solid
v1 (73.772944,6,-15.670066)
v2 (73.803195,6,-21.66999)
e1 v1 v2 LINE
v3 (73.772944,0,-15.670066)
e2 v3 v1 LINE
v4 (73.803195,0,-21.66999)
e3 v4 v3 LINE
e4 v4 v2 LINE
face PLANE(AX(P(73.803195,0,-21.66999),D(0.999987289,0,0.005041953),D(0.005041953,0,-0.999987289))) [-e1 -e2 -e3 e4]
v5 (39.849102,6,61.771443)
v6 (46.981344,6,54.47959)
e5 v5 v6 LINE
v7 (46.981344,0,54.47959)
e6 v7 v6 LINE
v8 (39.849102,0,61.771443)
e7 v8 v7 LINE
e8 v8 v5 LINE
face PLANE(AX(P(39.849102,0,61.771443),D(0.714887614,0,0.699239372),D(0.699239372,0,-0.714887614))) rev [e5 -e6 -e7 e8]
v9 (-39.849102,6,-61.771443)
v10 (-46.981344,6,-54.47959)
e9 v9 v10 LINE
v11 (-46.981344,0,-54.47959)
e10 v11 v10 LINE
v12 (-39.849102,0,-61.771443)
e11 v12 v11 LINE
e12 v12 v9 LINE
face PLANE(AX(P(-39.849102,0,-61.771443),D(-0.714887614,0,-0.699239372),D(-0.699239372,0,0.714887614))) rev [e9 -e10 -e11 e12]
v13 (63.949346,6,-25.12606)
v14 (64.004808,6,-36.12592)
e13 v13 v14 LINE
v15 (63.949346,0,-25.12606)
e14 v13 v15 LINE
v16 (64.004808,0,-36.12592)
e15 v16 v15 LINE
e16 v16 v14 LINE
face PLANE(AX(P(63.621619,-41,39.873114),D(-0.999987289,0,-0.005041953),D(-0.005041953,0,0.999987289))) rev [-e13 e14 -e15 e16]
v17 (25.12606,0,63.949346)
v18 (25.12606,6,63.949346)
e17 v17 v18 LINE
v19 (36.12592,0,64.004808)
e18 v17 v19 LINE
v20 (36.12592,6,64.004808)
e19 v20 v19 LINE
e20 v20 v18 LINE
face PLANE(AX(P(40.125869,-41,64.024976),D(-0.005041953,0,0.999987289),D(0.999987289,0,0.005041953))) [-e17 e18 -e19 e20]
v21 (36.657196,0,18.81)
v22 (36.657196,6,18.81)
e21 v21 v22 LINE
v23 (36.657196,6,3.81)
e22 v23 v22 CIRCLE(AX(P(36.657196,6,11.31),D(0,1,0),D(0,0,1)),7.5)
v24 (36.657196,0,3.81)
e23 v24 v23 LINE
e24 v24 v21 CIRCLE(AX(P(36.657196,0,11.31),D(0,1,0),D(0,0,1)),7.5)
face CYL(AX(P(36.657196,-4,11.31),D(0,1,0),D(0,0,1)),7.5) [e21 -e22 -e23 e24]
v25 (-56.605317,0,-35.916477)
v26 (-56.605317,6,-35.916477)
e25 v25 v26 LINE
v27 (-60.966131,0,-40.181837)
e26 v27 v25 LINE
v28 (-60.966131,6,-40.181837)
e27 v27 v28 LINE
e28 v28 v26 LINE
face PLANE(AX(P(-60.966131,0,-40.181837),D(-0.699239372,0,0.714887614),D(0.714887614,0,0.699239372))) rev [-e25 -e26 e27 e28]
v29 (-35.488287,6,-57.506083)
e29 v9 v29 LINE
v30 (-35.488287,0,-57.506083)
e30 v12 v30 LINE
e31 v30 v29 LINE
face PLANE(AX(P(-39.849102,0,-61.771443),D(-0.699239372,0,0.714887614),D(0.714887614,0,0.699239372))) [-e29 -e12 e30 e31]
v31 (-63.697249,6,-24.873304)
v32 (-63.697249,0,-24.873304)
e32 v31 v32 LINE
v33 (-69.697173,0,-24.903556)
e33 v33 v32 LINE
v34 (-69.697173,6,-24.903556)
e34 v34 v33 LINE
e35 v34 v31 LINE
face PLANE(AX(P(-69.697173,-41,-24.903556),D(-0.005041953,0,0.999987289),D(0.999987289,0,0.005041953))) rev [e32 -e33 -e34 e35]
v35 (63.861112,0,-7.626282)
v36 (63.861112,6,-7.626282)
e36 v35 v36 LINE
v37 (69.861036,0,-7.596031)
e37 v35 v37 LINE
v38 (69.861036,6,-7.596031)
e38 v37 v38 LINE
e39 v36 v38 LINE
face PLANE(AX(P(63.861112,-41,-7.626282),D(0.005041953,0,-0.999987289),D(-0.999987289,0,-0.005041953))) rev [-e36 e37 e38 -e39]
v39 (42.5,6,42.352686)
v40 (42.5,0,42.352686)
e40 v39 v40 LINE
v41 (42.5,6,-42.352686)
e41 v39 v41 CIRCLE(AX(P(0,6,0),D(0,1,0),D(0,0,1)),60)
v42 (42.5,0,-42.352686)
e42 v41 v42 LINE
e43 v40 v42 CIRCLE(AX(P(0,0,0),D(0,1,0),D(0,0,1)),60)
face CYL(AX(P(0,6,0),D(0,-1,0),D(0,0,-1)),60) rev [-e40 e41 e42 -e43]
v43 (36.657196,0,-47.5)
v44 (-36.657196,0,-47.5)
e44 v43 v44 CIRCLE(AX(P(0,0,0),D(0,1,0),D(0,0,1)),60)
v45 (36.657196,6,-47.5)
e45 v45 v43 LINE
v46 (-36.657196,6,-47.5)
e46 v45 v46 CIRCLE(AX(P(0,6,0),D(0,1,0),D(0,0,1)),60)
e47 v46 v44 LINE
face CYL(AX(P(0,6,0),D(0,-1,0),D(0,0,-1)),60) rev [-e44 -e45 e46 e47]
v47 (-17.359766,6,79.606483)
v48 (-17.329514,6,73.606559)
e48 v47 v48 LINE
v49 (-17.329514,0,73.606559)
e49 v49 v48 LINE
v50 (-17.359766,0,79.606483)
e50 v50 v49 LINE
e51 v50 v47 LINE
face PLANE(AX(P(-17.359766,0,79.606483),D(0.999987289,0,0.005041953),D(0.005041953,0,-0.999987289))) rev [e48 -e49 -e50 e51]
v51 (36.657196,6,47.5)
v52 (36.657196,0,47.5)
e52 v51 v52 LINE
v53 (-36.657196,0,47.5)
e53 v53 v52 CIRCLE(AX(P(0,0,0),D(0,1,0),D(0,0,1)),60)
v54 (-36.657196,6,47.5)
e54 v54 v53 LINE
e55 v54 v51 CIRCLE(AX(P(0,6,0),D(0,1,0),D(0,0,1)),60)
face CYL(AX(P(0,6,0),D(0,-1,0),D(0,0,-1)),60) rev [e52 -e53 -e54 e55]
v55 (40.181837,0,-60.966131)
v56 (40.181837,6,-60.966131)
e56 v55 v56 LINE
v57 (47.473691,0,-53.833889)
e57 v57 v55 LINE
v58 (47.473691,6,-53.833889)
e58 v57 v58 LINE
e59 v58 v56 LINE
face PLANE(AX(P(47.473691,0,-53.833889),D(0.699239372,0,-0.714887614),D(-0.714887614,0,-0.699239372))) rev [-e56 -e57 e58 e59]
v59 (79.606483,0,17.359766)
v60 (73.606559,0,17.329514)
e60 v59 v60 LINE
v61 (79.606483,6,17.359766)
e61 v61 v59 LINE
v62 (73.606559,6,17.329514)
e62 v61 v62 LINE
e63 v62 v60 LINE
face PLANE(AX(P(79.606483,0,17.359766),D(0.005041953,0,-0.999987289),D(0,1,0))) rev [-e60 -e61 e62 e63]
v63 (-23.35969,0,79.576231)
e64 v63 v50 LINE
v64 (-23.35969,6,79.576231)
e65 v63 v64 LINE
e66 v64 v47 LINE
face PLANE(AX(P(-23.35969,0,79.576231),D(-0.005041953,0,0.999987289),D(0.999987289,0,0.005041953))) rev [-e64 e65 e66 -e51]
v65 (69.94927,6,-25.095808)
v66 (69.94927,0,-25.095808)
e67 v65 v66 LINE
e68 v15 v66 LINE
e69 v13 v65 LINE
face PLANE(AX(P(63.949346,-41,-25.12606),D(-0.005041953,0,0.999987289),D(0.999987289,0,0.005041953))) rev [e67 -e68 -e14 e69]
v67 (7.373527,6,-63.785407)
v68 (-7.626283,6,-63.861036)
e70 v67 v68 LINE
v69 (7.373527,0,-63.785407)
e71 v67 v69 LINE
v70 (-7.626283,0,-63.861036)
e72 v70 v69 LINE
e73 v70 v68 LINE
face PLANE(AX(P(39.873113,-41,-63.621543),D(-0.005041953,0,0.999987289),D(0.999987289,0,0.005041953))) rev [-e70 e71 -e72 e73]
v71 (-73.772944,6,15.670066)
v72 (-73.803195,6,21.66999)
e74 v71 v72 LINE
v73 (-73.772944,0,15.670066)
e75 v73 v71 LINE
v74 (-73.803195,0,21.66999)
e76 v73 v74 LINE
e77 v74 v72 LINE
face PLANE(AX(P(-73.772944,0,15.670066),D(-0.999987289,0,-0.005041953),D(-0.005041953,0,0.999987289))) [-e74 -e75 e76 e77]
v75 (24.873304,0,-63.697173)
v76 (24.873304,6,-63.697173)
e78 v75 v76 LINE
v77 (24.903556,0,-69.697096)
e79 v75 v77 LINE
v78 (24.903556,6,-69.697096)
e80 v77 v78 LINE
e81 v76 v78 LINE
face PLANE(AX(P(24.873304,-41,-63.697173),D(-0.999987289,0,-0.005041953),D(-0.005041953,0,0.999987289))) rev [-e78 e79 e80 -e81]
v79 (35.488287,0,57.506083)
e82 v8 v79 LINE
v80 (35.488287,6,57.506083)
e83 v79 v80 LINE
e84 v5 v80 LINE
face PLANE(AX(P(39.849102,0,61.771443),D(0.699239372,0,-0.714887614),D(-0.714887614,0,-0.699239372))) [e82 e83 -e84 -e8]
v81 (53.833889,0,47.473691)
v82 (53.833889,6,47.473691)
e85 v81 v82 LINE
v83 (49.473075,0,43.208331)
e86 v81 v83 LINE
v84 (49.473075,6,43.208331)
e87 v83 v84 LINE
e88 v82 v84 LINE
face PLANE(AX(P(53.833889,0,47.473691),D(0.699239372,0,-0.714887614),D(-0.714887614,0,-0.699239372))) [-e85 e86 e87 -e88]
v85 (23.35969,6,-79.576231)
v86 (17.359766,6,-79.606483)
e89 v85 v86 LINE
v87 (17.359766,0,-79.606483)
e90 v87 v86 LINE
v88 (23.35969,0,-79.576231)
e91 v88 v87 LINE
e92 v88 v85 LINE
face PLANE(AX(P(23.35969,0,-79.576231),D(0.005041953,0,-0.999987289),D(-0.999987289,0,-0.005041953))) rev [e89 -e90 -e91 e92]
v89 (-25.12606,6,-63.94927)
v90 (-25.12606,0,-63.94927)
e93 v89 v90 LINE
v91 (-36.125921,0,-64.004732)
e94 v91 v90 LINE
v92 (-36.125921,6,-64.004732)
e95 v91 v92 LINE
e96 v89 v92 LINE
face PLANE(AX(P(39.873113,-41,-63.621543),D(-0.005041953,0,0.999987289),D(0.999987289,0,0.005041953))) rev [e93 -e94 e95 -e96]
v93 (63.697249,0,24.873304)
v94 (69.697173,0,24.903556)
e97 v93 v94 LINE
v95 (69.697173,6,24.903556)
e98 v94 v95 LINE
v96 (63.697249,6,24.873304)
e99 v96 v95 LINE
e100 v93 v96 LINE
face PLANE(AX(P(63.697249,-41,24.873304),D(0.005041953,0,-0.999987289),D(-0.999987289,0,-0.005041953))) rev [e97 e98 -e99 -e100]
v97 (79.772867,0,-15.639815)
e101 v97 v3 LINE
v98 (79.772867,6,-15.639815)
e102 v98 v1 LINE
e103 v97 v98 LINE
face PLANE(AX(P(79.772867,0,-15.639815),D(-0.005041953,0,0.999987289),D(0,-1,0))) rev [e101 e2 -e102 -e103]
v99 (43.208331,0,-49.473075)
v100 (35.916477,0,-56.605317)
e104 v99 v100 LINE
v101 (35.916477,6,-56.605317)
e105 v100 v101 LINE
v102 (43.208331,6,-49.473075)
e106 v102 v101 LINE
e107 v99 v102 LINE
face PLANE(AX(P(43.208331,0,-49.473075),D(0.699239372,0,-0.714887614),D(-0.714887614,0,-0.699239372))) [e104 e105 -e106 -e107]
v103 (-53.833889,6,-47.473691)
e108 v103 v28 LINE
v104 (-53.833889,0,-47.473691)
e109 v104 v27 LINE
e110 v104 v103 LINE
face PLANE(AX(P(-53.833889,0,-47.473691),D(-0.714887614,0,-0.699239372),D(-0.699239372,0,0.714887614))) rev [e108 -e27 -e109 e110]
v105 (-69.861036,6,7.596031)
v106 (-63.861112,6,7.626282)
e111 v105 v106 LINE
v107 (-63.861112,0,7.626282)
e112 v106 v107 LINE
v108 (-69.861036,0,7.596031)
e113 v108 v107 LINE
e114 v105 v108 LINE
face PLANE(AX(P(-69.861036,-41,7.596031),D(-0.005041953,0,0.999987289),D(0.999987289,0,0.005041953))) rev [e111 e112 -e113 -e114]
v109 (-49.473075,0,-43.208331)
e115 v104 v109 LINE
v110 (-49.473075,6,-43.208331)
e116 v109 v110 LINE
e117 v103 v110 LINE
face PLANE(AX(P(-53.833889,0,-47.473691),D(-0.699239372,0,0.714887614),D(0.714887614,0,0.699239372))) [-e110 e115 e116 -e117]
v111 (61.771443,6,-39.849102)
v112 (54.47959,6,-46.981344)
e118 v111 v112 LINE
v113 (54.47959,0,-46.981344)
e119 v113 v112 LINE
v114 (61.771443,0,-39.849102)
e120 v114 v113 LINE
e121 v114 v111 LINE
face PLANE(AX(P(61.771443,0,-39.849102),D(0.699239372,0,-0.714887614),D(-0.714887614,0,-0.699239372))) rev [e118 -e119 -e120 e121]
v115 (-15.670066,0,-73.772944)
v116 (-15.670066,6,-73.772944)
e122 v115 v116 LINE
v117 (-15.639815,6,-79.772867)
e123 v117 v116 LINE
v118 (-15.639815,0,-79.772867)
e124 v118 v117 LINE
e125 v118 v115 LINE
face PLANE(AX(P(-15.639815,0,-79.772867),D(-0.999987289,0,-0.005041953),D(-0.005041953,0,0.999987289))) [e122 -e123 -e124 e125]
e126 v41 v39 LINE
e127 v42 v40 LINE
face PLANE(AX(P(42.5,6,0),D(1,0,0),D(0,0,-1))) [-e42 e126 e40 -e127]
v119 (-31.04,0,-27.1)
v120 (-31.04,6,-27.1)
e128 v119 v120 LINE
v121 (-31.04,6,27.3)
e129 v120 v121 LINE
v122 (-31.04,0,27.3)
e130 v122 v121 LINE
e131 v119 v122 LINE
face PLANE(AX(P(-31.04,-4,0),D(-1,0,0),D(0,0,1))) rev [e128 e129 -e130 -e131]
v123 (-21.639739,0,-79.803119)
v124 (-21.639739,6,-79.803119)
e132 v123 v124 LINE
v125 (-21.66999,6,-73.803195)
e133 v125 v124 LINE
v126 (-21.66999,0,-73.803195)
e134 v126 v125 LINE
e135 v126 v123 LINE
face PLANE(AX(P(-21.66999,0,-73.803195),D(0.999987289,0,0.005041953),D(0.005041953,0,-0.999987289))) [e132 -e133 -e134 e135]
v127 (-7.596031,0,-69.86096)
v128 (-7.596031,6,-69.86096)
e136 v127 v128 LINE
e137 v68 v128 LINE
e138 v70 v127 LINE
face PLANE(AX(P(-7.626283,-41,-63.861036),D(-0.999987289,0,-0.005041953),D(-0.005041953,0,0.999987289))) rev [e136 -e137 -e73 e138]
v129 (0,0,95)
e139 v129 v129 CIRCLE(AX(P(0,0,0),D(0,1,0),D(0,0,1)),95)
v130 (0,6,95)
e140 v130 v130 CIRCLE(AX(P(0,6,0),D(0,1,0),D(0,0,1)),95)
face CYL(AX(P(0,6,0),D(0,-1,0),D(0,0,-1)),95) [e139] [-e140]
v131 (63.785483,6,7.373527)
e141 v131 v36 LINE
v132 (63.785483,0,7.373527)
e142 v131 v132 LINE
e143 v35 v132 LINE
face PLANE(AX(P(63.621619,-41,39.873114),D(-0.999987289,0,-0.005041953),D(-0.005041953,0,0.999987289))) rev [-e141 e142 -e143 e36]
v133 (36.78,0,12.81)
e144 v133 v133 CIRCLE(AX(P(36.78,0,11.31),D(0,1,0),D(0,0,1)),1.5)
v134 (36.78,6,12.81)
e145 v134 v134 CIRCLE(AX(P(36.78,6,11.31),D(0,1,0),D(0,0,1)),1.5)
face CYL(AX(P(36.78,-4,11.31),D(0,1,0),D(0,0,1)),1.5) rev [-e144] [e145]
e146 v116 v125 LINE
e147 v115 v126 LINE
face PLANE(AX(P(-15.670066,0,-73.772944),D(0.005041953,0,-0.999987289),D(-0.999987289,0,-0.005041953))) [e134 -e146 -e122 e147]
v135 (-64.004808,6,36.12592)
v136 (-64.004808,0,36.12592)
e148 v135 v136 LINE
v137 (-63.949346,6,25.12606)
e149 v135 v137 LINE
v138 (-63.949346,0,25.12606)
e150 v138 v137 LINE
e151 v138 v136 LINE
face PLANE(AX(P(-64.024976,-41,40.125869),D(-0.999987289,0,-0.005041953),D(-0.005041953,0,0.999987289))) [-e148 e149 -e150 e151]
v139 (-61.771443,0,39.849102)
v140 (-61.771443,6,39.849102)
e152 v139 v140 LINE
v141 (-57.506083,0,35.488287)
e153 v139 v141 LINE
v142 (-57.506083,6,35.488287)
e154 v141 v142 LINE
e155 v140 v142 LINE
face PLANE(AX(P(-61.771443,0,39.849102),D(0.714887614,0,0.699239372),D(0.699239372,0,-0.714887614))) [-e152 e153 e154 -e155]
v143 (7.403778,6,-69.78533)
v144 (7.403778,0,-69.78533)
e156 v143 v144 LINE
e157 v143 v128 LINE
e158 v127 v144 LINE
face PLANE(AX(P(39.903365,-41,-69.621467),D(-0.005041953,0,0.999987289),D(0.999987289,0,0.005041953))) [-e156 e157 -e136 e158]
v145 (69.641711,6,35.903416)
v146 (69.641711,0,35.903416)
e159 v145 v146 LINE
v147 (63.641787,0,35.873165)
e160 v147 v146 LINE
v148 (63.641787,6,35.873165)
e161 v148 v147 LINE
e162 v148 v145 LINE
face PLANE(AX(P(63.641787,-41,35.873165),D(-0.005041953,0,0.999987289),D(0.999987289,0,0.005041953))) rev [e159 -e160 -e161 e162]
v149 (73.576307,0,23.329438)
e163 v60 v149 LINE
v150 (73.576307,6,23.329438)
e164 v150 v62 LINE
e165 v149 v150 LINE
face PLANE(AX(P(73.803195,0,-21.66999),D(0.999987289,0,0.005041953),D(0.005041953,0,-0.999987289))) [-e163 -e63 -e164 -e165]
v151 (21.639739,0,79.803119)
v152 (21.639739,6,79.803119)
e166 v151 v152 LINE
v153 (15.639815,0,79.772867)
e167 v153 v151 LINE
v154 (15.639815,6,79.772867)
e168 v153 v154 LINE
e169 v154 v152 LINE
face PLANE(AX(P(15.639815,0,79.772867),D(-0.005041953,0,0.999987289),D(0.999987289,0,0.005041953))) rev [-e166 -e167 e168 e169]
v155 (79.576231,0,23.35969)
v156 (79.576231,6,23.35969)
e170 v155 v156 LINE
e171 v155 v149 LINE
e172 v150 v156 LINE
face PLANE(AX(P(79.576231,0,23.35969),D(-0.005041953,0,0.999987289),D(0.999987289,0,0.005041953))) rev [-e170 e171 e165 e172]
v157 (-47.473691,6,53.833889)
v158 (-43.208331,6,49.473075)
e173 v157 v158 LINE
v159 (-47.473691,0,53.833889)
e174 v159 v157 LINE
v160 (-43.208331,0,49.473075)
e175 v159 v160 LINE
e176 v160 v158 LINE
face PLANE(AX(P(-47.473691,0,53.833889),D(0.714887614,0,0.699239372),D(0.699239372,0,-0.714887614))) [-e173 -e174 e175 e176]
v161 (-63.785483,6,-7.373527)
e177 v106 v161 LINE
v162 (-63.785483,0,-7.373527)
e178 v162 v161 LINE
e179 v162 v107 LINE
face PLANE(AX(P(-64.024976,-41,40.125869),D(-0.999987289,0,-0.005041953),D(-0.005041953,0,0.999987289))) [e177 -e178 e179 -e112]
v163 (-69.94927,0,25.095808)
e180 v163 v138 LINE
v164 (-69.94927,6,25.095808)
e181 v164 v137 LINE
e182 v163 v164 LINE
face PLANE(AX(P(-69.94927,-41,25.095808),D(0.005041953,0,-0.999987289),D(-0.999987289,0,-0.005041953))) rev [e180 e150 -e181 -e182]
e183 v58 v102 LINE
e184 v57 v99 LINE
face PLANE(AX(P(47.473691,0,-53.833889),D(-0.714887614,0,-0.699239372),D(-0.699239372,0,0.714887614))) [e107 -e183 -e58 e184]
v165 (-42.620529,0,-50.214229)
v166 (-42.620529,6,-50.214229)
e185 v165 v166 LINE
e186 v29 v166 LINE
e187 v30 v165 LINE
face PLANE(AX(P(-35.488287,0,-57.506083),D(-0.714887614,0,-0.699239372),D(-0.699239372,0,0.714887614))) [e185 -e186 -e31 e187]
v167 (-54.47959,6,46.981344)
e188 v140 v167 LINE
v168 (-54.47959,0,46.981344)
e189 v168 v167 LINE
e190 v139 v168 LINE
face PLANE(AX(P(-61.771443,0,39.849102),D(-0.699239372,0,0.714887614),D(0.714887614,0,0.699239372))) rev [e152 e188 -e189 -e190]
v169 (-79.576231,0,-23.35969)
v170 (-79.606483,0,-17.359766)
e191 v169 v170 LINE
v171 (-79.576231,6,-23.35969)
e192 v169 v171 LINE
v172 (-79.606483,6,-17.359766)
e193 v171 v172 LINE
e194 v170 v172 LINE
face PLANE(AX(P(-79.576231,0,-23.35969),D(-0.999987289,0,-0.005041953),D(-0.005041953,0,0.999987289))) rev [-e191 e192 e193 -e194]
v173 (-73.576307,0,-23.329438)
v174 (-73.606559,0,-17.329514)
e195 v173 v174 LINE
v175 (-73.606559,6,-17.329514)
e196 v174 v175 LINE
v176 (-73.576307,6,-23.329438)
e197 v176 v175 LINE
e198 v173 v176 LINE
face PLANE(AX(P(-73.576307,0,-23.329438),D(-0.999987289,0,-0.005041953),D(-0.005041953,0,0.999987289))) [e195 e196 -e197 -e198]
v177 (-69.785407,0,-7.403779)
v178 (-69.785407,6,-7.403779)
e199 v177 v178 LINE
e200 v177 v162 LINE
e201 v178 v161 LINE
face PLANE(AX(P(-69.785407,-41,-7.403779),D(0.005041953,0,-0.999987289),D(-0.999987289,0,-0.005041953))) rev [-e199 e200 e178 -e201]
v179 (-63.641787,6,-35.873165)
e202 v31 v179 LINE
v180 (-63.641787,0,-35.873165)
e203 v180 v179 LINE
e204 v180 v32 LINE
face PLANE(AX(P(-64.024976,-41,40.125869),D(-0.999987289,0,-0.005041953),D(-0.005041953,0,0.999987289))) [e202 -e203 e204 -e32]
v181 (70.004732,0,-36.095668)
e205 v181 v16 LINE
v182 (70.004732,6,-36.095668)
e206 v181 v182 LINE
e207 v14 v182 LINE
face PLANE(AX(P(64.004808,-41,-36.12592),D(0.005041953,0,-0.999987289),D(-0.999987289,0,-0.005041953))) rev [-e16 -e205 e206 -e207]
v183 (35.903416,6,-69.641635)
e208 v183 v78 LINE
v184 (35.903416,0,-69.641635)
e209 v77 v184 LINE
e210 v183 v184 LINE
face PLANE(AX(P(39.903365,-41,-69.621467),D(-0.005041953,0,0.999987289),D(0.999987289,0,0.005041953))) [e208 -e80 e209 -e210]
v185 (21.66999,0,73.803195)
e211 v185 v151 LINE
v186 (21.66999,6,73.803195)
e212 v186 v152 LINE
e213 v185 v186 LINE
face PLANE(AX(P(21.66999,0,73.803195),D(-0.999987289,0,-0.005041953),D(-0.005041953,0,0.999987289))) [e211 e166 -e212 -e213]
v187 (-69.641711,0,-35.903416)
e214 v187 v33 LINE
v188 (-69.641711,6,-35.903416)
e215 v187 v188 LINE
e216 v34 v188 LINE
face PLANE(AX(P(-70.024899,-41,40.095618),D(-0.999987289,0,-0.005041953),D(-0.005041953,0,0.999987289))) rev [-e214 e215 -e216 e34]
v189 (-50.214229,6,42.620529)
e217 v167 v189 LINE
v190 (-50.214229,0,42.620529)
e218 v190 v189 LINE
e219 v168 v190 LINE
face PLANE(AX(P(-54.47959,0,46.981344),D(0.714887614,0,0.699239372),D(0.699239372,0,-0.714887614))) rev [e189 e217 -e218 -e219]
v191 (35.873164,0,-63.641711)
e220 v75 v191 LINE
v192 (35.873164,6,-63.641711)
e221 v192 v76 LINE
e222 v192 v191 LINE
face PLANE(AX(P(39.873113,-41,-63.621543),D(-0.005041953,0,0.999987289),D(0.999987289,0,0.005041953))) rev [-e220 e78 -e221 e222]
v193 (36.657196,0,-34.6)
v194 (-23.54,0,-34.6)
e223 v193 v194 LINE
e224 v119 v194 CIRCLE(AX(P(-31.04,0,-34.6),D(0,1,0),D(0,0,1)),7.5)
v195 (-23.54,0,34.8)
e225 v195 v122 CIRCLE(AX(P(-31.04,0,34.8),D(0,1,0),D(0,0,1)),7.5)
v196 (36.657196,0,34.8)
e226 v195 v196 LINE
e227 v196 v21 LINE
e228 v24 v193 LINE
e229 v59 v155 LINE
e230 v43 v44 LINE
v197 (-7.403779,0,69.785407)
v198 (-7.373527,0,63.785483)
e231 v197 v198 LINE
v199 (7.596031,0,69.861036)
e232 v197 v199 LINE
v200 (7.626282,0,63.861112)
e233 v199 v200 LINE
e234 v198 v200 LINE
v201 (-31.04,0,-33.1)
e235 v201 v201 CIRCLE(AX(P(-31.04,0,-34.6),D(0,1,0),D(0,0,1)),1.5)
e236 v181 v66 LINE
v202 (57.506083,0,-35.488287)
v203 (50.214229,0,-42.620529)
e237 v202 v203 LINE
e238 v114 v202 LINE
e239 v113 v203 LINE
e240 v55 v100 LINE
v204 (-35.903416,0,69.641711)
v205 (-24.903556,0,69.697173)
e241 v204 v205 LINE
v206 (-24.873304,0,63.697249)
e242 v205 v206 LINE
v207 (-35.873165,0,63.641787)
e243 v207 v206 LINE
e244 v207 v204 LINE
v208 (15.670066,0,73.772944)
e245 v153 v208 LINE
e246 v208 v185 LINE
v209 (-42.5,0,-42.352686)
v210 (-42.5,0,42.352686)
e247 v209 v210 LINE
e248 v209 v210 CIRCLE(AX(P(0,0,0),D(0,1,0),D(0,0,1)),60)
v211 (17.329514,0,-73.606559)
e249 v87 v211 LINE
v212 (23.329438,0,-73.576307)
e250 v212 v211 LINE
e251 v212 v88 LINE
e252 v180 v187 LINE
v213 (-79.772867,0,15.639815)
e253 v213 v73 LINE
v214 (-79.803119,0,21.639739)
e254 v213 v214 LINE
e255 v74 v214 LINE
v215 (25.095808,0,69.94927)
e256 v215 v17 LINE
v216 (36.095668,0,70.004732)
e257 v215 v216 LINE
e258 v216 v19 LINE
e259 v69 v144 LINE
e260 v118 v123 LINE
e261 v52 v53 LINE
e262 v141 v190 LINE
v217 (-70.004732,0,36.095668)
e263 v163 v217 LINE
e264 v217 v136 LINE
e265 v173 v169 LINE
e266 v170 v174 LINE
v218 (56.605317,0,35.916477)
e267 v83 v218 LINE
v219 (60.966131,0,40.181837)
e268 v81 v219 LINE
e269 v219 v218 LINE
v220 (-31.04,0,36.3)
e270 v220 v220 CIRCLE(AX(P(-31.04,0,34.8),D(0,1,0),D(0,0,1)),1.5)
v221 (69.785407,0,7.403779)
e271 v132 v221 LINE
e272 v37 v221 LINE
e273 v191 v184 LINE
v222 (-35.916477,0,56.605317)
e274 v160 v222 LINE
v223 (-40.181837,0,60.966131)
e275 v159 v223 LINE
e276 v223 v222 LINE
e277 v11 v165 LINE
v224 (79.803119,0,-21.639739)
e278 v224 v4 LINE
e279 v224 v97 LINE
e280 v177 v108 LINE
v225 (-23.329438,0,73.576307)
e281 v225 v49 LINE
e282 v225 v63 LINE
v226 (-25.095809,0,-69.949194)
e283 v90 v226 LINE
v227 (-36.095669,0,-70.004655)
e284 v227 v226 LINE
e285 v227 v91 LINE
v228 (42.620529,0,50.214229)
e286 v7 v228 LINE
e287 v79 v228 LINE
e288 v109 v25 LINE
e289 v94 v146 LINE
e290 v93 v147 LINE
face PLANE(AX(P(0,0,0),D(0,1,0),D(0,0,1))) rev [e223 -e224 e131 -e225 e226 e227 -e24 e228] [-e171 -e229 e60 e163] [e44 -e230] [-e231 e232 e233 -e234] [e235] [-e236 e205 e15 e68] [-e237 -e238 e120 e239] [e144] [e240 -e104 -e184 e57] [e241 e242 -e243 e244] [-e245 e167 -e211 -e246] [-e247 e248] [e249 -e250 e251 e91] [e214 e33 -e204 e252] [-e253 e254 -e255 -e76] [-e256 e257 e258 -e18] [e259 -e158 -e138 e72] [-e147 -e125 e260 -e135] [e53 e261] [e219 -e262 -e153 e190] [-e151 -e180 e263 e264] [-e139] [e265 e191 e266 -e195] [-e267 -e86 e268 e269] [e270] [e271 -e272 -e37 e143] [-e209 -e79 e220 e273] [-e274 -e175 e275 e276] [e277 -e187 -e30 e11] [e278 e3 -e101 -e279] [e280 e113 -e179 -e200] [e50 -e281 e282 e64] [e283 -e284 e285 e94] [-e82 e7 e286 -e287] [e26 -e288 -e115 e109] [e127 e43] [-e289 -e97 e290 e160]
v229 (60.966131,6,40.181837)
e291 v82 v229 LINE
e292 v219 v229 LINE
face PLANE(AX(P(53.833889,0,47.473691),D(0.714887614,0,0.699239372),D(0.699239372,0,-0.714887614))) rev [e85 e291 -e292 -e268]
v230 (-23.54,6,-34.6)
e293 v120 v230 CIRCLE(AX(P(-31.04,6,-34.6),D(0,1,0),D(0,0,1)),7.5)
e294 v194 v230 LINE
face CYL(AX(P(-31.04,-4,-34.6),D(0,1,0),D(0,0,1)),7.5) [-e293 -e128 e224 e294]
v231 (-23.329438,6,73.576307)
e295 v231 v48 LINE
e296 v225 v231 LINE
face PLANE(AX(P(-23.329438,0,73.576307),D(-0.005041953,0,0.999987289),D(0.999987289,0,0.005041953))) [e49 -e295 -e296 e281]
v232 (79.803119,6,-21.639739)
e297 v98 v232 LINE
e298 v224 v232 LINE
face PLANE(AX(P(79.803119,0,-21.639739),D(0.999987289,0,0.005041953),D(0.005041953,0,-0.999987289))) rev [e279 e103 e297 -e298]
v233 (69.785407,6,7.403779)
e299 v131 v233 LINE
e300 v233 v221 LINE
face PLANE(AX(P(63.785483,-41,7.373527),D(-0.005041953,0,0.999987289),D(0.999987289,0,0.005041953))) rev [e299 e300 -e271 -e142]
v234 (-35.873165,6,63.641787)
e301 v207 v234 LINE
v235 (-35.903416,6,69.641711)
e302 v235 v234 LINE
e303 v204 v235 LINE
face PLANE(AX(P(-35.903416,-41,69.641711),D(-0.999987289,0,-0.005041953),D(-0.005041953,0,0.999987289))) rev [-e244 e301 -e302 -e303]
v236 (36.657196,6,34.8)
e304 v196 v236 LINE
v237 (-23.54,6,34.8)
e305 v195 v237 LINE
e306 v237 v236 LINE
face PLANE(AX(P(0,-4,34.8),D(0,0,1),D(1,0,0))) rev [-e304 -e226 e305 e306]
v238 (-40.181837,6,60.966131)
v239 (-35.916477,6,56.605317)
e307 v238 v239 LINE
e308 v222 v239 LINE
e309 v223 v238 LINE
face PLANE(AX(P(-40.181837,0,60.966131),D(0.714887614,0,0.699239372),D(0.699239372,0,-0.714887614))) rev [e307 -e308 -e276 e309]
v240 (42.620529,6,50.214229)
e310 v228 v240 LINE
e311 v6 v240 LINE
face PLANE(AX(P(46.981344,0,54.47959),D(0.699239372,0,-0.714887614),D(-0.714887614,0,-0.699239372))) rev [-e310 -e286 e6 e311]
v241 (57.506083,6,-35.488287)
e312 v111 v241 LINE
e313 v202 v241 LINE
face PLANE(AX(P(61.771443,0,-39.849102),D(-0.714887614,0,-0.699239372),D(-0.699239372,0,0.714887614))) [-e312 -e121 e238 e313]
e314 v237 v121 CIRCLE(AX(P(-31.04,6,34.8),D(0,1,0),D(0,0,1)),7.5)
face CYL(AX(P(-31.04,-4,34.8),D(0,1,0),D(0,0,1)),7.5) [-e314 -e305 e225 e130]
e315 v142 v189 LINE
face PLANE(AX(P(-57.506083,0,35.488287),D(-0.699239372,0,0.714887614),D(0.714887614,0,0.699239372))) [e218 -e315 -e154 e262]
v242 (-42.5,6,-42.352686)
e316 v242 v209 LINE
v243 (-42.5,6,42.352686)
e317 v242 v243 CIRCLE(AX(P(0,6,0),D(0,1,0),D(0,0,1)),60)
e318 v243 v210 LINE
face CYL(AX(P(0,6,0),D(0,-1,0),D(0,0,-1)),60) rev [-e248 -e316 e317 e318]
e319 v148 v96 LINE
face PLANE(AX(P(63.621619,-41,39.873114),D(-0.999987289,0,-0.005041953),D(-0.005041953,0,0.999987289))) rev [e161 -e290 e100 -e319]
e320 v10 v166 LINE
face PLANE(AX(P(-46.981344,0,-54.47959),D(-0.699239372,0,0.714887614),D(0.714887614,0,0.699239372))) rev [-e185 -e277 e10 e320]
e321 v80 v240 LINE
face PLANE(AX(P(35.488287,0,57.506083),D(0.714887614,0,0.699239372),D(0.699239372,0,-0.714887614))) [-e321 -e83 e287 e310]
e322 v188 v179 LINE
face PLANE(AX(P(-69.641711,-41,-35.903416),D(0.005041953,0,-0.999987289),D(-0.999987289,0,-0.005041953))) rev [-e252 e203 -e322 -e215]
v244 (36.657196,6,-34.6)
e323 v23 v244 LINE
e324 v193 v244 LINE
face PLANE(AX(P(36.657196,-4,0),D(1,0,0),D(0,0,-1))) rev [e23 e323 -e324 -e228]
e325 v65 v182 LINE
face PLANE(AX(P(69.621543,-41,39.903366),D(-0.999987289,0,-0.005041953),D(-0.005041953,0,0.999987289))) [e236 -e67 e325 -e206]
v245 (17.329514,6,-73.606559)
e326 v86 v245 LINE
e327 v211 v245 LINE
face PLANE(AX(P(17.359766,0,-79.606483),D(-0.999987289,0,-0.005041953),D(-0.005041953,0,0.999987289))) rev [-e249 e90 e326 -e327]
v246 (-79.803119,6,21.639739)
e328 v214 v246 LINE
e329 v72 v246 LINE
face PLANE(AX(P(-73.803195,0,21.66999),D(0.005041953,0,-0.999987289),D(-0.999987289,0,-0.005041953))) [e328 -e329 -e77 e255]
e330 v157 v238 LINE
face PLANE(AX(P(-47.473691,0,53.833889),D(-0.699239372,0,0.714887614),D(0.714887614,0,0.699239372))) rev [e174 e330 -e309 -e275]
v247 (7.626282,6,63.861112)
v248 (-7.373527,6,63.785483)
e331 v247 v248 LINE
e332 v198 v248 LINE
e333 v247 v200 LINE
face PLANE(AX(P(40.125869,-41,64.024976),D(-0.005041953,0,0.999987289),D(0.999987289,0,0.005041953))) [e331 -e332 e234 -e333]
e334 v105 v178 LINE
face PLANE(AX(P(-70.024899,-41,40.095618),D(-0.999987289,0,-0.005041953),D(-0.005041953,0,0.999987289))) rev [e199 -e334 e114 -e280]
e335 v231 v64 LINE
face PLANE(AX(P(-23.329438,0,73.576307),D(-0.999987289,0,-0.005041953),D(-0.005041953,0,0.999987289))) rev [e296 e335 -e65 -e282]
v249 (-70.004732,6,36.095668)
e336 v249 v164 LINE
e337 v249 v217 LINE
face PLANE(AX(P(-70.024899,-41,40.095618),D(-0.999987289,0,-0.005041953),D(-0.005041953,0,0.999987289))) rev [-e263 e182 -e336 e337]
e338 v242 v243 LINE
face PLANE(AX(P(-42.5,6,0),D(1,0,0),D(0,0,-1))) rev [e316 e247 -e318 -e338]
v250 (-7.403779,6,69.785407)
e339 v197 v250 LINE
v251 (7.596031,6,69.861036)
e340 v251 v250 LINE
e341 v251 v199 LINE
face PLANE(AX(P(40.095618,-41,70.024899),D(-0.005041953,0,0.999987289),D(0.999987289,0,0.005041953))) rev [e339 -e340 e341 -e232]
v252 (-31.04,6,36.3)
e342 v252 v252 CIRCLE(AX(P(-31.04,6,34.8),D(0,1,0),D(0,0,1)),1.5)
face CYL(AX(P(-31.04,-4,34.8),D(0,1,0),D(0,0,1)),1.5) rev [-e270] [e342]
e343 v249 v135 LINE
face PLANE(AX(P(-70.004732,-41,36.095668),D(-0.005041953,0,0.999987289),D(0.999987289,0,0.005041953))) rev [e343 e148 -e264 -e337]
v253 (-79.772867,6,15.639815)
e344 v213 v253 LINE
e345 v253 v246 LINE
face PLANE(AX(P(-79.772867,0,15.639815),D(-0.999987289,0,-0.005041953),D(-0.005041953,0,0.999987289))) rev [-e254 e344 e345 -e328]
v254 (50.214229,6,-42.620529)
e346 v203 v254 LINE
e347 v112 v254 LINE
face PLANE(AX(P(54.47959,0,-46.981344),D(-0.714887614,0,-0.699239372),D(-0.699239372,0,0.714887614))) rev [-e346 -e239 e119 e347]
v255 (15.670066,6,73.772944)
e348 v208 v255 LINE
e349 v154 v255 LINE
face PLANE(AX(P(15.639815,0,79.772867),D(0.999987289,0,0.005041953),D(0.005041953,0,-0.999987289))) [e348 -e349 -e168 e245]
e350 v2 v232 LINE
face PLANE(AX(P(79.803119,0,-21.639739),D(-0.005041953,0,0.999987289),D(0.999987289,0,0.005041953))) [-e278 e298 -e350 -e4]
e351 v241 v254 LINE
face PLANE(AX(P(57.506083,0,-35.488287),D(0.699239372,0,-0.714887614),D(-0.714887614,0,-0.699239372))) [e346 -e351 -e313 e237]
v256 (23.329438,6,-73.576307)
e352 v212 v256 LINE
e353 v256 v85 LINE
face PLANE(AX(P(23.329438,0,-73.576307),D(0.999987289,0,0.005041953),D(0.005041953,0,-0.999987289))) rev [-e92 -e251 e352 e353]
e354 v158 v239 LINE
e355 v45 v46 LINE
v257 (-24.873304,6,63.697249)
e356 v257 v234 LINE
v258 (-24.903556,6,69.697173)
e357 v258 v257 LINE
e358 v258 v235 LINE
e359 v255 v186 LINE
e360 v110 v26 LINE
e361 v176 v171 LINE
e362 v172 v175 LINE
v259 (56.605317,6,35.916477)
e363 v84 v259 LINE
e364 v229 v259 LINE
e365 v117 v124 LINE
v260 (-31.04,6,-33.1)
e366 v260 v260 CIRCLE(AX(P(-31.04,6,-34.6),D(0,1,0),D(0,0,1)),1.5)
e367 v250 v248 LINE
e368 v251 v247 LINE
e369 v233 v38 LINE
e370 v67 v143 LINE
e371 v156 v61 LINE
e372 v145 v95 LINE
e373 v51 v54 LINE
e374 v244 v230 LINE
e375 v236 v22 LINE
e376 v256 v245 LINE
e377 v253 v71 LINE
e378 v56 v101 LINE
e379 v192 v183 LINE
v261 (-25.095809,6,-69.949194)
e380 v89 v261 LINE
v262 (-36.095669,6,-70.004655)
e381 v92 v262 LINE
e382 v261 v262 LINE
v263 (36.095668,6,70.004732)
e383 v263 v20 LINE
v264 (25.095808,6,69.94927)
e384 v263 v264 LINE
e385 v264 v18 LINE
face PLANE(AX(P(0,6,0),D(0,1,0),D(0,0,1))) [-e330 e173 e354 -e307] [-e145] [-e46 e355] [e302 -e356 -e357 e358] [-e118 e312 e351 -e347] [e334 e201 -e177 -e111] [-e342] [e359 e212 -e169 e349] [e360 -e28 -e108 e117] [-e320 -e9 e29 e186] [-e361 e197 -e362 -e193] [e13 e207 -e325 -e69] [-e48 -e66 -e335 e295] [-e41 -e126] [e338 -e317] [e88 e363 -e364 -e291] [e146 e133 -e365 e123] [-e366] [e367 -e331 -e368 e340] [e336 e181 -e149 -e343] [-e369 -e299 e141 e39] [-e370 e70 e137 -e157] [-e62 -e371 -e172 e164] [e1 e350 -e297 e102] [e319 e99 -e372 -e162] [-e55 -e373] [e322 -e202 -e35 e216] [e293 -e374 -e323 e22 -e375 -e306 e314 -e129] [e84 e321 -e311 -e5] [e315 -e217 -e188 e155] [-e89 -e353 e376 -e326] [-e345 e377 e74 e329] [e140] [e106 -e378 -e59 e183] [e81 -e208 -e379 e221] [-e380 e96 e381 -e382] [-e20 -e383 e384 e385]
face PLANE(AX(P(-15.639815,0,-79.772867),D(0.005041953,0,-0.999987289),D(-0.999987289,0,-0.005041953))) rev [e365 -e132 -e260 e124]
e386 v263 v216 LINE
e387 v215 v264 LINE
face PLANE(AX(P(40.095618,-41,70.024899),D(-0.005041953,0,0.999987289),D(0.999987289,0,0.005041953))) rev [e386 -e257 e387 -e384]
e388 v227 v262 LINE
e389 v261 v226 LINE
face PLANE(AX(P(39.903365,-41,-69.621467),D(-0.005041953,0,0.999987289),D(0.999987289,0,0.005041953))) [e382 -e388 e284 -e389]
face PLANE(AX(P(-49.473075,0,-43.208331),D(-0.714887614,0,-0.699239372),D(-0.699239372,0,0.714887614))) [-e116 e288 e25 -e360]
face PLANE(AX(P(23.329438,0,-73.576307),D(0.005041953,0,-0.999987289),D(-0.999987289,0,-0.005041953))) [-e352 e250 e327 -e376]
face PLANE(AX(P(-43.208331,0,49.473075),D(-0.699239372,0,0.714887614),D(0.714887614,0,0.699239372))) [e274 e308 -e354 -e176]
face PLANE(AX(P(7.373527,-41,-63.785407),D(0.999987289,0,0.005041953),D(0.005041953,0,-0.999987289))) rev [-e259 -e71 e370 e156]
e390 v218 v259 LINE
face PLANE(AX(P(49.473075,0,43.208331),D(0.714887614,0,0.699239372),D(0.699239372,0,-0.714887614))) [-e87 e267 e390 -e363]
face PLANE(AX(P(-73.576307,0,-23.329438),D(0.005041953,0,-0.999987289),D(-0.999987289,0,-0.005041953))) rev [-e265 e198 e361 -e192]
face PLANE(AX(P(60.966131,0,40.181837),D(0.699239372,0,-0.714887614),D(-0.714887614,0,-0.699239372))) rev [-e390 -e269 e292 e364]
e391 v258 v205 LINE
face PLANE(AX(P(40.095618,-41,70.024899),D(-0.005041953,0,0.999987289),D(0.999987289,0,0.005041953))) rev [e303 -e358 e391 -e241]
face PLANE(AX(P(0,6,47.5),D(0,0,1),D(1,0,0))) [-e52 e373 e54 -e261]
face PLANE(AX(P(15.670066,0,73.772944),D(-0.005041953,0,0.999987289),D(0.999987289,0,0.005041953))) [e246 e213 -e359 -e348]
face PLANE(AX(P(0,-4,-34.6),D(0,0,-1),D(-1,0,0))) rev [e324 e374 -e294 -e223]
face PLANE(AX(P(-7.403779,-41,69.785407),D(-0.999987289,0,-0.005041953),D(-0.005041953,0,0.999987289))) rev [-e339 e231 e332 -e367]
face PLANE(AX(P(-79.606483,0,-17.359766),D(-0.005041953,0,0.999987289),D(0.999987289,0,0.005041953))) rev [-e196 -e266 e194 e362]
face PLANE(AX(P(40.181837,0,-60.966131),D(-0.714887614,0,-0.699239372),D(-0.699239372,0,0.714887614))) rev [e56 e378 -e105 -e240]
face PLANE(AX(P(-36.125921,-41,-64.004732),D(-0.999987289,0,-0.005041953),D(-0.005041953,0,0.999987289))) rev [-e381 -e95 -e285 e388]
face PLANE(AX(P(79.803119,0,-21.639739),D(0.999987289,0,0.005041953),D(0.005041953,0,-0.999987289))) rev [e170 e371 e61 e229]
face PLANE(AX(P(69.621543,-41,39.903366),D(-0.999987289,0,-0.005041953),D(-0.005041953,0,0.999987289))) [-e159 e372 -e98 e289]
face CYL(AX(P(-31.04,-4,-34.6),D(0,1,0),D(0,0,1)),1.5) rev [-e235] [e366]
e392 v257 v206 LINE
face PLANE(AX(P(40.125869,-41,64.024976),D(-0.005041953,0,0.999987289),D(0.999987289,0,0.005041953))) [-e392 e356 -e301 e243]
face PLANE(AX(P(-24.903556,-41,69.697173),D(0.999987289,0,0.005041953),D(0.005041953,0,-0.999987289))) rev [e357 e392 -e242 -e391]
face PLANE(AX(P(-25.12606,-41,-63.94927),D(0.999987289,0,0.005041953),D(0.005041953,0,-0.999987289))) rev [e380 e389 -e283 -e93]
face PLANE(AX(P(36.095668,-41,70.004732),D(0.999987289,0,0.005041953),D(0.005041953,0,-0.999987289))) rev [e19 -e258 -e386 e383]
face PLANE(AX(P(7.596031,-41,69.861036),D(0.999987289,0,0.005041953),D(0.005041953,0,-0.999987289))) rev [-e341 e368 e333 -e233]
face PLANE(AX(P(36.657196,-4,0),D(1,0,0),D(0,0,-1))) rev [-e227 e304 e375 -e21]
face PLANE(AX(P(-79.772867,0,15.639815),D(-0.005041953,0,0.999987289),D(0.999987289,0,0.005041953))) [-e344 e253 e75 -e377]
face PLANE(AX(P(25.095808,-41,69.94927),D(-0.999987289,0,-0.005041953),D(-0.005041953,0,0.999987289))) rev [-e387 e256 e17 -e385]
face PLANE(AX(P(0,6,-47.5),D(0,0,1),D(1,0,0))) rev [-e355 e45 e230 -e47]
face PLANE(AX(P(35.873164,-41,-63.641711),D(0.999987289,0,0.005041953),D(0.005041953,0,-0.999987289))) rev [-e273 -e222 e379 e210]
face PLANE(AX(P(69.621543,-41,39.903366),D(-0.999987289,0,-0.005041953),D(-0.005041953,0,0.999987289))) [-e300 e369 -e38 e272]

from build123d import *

# Parameters (mm, degrees)
SKETCH1_R             = 95
BOSS_EXTRUDE1_DEPTH   = 6
SKETCH2_W             = 55
SKETCH2_H             = 30
CUT_EXTRUDE1_DEPTH    = 135.484199815
CAVITY1_START         = -69.821849164
CAVITY1_OUTLINE_W     = 15
CAVITY1_OUTLINE_H     = 6
CAVITY1_OUTLINE_W_2   = 11
CAVITY1_DEPTH         = 6
CAVITY1_START_2       = 63.821772898
CAVITY1_2_OUTLINE_W   = 11
CAVITY1_2_OUTLINE_H   = 6
CAVITY1_2_OUTLINE_W_2 = 15
CAVITY1_2_DEPTH       = 6
CAVITY1_START_3       = -7.051829773
CAVITY1_3_OUTLINE_W   = 6
CAVITY1_3_OUTLINE_H   = 6
CAVITY1_3_DEPTH       = 14.103659546
CAVITY1_START_4       = -35.551829773
CAVITY1_4_OUTLINE_W   = 6
CAVITY1_4_OUTLINE_H   = 6
CAVITY1_4_DEPTH       = 10.103659546
CAVITY1_START_5       = 25.448170227
CAVITY1_5_OUTLINE_W   = 6
CAVITY1_5_OUTLINE_H   = 6
CAVITY1_5_DEPTH       = 10.103659546
CAVITY1_START_6       = -36.448170227
CAVITY1_6_OUTLINE_W   = 6
CAVITY1_6_OUTLINE_H   = 6
CAVITY1_6_DEPTH       = 0.896340454
CAVITY1_START_7       = -25.448170227
CAVITY1_7_OUTLINE_W   = 6
CAVITY1_7_OUTLINE_H   = 6
CAVITY1_7_DEPTH       = 0.896340454
CAVITY1_START_8       = -7.948170227
CAVITY1_8_OUTLINE_W   = 6
CAVITY1_8_OUTLINE_H   = 6
CAVITY1_8_DEPTH       = 0.896340454
CAVITY1_START_9       = 7.051829773
CAVITY1_9_OUTLINE_W   = 6
CAVITY1_9_OUTLINE_H   = 6
CAVITY1_9_DEPTH       = 0.896340454
CAVITY1_START_10      = 24.551829773
CAVITY1_10_OUTLINE_W  = 6
CAVITY1_10_OUTLINE_H  = 6
CAVITY1_10_DEPTH      = 0.896340454
CAVITY1_START_11      = 35.551829773
CAVITY1_11_OUTLINE_W  = 6
CAVITY1_11_OUTLINE_H  = 6
CAVITY1_11_DEPTH      = 0.896340454
SKETCH3_R             = 1.5
CUT_EXTRUDE3_DEPTH    = 10
CUT_EXTRUDE4_DEPTH    = 135.484199815
CAVITY2_START         = 73.692998072
CAVITY2_OUTLINE_W     = 6
CAVITY2_OUTLINE_H     = 6
CAVITY2_DEPTH         = 6
CUT_EXTRUDE5_DEPTH    = 135.484199815


# Read off the part's stored shape, not the designer's step: Cavity1, Cavity2
with BuildPart() as part:
    # Sketch1 → Boss-Extrude1 (new body)
    with BuildSketch(Plane(origin=(0, 0, 0), x_dir=(1, 0, 0), z_dir=(0, 1, 0))):
        with Locations(Location((0, 0, 0), (0, 0, 270))):
            Circle(SKETCH1_R)
        with BuildLine():
            Line((-36.657195747, -47.5), (36.657195747, -47.5))
            ThreePointArc((36.657195747, -47.5), (0, -60), (-36.657195747, -47.5))
        make_face(mode=Mode.SUBTRACT)
        with BuildLine():
            Line((-42.5, 42.352685865), (-42.5, -42.352685865))
            ThreePointArc((-42.5, -42.352685865), (-60, 0), (-42.5, 42.352685865))
        make_face(mode=Mode.SUBTRACT)
        with BuildLine():
            Line((36.657195747, 47.5), (-36.657195747, 47.5))
            ThreePointArc((-36.657195747, 47.5), (0, 60), (36.657195747, 47.5))
        make_face(mode=Mode.SUBTRACT)
        with BuildLine():
            Line((42.5, -42.352685865), (42.5, 42.352685865))
            ThreePointArc((42.5, 42.352685865), (60, 0), (42.5, -42.352685865))
        make_face(mode=Mode.SUBTRACT)
    extrude(amount=BOSS_EXTRUDE1_DEPTH)

    # Sketch2 → Cut-Extrude1 (cut, through all)
    with BuildSketch(Plane(origin=(0, 6, 0), x_dir=(1, 0, 0), z_dir=(0, 1, 0))):
        Rectangle(SKETCH2_W, SKETCH2_H)
    extrude(amount=-CUT_EXTRUDE1_DEPTH, mode=Mode.SUBTRACT)

    # Cavity1 outline → Cavity1 (cut)
    with BuildSketch(Plane(origin=(0, 0, 0), x_dir=(0.9999872892756082, 0, 0.005041952719030872), z_dir=(0.005041952719030872, 0, -0.9999872892756083)).offset(CAVITY1_START)):
        with Locations((0.448170227, -3)):
            Rectangle(CAVITY1_OUTLINE_W, CAVITY1_OUTLINE_H)
        with Locations((30.948170227, -3)):
            Rectangle(CAVITY1_OUTLINE_W_2, CAVITY1_OUTLINE_H)
        with Locations((-30.051829773, -3)):
            Rectangle(CAVITY1_OUTLINE_W_2, CAVITY1_OUTLINE_H)
    extrude(amount=CAVITY1_DEPTH, mode=Mode.SUBTRACT)

    # Cavity1 2 outline → Cavity1 2 (cut)
    with BuildSketch(Plane(origin=(0, 0, 0), x_dir=(0.9999872892756082, 0, 0.005041952719030872), z_dir=(0.005041952719030872, 0, -0.9999872892756083)).offset(CAVITY1_START_2)):
        with Locations((30.051829773, -3)):
            Rectangle(CAVITY1_2_OUTLINE_W, CAVITY1_2_OUTLINE_H)
        with Locations((-0.448170227, -3)):
            Rectangle(CAVITY1_2_OUTLINE_W_2, CAVITY1_2_OUTLINE_H)
        with Locations((-30.948170227, -3)):
            Rectangle(CAVITY1_2_OUTLINE_W, CAVITY1_2_OUTLINE_H)
    extrude(amount=CAVITY1_2_DEPTH, mode=Mode.SUBTRACT)

    # Cavity1 3 outline → Cavity1 3 (cut)
    with BuildSketch(Plane(origin=(0, 0, 0), x_dir=(0.9999872892756082, 0, 0.005041952719030872), z_dir=(0.005041952719030872, 0, -0.9999872892756083)).offset(CAVITY1_START_3)):
        with Locations((66.821849164, -3)):
            Rectangle(CAVITY1_3_OUTLINE_W, CAVITY1_3_OUTLINE_H)
        with Locations((-66.821849164, -3)):
            Rectangle(CAVITY1_3_OUTLINE_W, CAVITY1_3_OUTLINE_H)
    extrude(amount=CAVITY1_3_DEPTH, mode=Mode.SUBTRACT)

    # Cavity1 4 outline → Cavity1 4 (cut)
    with BuildSketch(Plane(origin=(0, 0, 0), x_dir=(0.9999872892756082, 0, 0.005041952719030872), z_dir=(0.005041952719030872, 0, -0.9999872892756083)).offset(CAVITY1_START_4)):
        with Locations((66.821849164, -3)):
            Rectangle(CAVITY1_4_OUTLINE_W, CAVITY1_4_OUTLINE_H)
        with Locations((-66.821849164, -3)):
            Rectangle(CAVITY1_4_OUTLINE_W, CAVITY1_4_OUTLINE_H)
    extrude(amount=CAVITY1_4_DEPTH, mode=Mode.SUBTRACT)

    # Cavity1 5 outline → Cavity1 5 (cut)
    with BuildSketch(Plane(origin=(0, 0, 0), x_dir=(0.9999872892756082, 0, 0.005041952719030872), z_dir=(0.005041952719030872, 0, -0.9999872892756083)).offset(CAVITY1_START_5)):
        with Locations((66.821849164, -3)):
            Rectangle(CAVITY1_5_OUTLINE_W, CAVITY1_5_OUTLINE_H)
        with Locations((-66.821849164, -3)):
            Rectangle(CAVITY1_5_OUTLINE_W, CAVITY1_5_OUTLINE_H)
    extrude(amount=CAVITY1_5_DEPTH, mode=Mode.SUBTRACT)

    # Cavity1 6 outline → Cavity1 6 (cut)
    with BuildSketch(Plane(origin=(0, 0, 0), x_dir=(0.9999872892756082, 0, 0.005041952719030872), z_dir=(0.005041952719030872, 0, -0.9999872892756083)).offset(CAVITY1_START_6)):
        with Locations((-66.821849164, -3)):
            Rectangle(CAVITY1_6_OUTLINE_W, CAVITY1_6_OUTLINE_H)
    extrude(amount=CAVITY1_6_DEPTH, mode=Mode.SUBTRACT)

    # Cavity1 7 outline → Cavity1 7 (cut)
    with BuildSketch(Plane(origin=(0, 0, 0), x_dir=(0.9999872892756082, 0, 0.005041952719030872), z_dir=(0.005041952719030872, 0, -0.9999872892756083)).offset(CAVITY1_START_7)):
        with Locations((66.821849164, -3)):
            Rectangle(CAVITY1_7_OUTLINE_W, CAVITY1_7_OUTLINE_H)
    extrude(amount=CAVITY1_7_DEPTH, mode=Mode.SUBTRACT)

    # Cavity1 8 outline → Cavity1 8 (cut)
    with BuildSketch(Plane(origin=(0, 0, 0), x_dir=(0.9999872892756082, 0, 0.005041952719030872), z_dir=(0.005041952719030872, 0, -0.9999872892756083)).offset(CAVITY1_START_8)):
        with Locations((-66.821849164, -3)):
            Rectangle(CAVITY1_8_OUTLINE_W, CAVITY1_8_OUTLINE_H)
    extrude(amount=CAVITY1_8_DEPTH, mode=Mode.SUBTRACT)

    # Cavity1 9 outline → Cavity1 9 (cut)
    with BuildSketch(Plane(origin=(0, 0, 0), x_dir=(0.9999872892756082, 0, 0.005041952719030872), z_dir=(0.005041952719030872, 0, -0.9999872892756083)).offset(CAVITY1_START_9)):
        with Locations((66.821849164, -3)):
            Rectangle(CAVITY1_9_OUTLINE_W, CAVITY1_9_OUTLINE_H)
    extrude(amount=CAVITY1_9_DEPTH, mode=Mode.SUBTRACT)

    # Cavity1 10 outline → Cavity1 10 (cut)
    with BuildSketch(Plane(origin=(0, 0, 0), x_dir=(0.9999872892756082, 0, 0.005041952719030872), z_dir=(0.005041952719030872, 0, -0.9999872892756083)).offset(CAVITY1_START_10)):
        with Locations((-66.821849164, -3)):
            Rectangle(CAVITY1_10_OUTLINE_W, CAVITY1_10_OUTLINE_H)
    extrude(amount=CAVITY1_10_DEPTH, mode=Mode.SUBTRACT)

    # Cavity1 11 outline → Cavity1 11 (cut)
    with BuildSketch(Plane(origin=(0, 0, 0), x_dir=(0.9999872892756082, 0, 0.005041952719030872), z_dir=(0.005041952719030872, 0, -0.9999872892756083)).offset(CAVITY1_START_11)):
        with Locations((66.821849164, -3)):
            Rectangle(CAVITY1_11_OUTLINE_W, CAVITY1_11_OUTLINE_H)
    extrude(amount=CAVITY1_11_DEPTH, mode=Mode.SUBTRACT)

    # Sketch3 → Cut-Extrude3 (cut)
    with BuildSketch(Plane(origin=(0, 6, 0), x_dir=(1, 0, 0), z_dir=(0, 1, 0))):
        with Locations(Location((-31.04, -34.8, 0), (0, 0, 270))):
            Circle(SKETCH3_R)
        with Locations(Location((-31.04, 34.6, 0), (0, 0, 270))):
            Circle(SKETCH3_R)
        with Locations(Location((36.78, -11.31, 0), (0, 0, 270))):
            Circle(SKETCH3_R)
        with BuildLine():
            ThreePointArc((36.657195747, -18.81), (29.157195747, -11.31), (36.657195747, -3.81))
            Line((36.657195747, -3.81), (36.657195747, 34.6))
            Line((36.657195747, 34.6), (-23.54, 34.6))
            ThreePointArc((-23.54, 34.6), (-25.736699141, 29.296699141), (-31.04, 27.1))
            Line((-31.04, 27.1), (-31.04, -27.3))
            ThreePointArc((-31.04, -27.3), (-25.736699141, -29.496699141), (-23.54, -34.8))
            Line((-23.54, -34.8), (36.657195747, -34.8))
            Line((36.657195747, -34.8), (36.657195747, -18.81))
        make_face()
    extrude(amount=-CUT_EXTRUDE3_DEPTH, mode=Mode.SUBTRACT)

    # Sketch4 → Cut-Extrude4 (cut, through all)
    with BuildSketch(Plane(origin=(0, 6, 0), x_dir=(1, 0, 0), z_dir=(0, 1, 0))):
        Polygon((39.849101937, -61.771443224), (35.488287493, -57.506083054), (42.620529088, -50.214229392), (46.981343533, -54.479589562), align=None)
        Polygon((53.83388938, -47.473690947), (60.966130976, -40.181837285), (56.605316531, -35.916477115), (49.473074935, -43.208330777), align=None)
        Polygon((-61.771443224, -39.849101937), (-57.506083054, -35.488287493), (-50.214229392, -42.620529088), (-54.479589562, -46.981343533), align=None)
        Polygon((-47.473690947, -53.83388938), (-43.208330777, -49.473074935), (-35.916477115, -56.605316531), (-40.181837285, -60.966130976), align=None)
        Polygon((-39.849101937, 61.771443224), (-35.488287493, 57.506083054), (-42.620529088, 50.214229392), (-46.981343533, 54.479589562), align=None)
        Polygon((-53.83388938, 47.473690947), (-49.473074935, 43.208330777), (-56.605316531, 35.916477115), (-60.966130976, 40.181837285), align=None)
        Polygon((61.771443224, 39.849101937), (57.506083054, 35.488287493), (50.214229392, 42.620529088), (54.479589562, 46.981343533), align=None)
        Polygon((47.473690947, 53.83388938), (43.208330777, 49.473074935), (35.916477115, 56.605316531), (40.181837285, 60.966130976), align=None)
    extrude(amount=-CUT_EXTRUDE4_DEPTH, mode=Mode.SUBTRACT)

    # Cavity2 outline → Cavity2 (cut)
    with BuildSketch(Plane(origin=(0, 0, 0), x_dir=(0, 1, 0), z_dir=(0.9999872892756082, 0, 0.005041952719040901)).offset(CAVITY2_START)):
        with Locations((3, -19.041827)):
            Rectangle(CAVITY2_OUTLINE_W, CAVITY2_OUTLINE_H)
        with Locations((3, 19.958173)):
            Rectangle(CAVITY2_OUTLINE_W, CAVITY2_OUTLINE_H)
    extrude(amount=CAVITY2_DEPTH, mode=Mode.SUBTRACT)

    # Sketch5 → Cut-Extrude5 (cut, through all)
    with BuildSketch(Plane(origin=(0, 6, 0), x_dir=(1, 0, 0), z_dir=(0, 1, 0))):
        Polygon((15.670066484, -73.772943514), (21.66999022, -73.80319523), (21.639738504, -79.803118966), (15.639814768, -79.77286725), align=None)
        Polygon((-23.329437797, -73.576307358), (-23.359689514, -79.576231094), (-17.359765778, -79.60648281), (-17.329514062, -73.606559074), align=None)
        Polygon((-73.772943514, -15.670066484), (-73.80319523, -21.66999022), (-79.803118966, -21.639738504), (-79.77286725, -15.639814768), align=None)
        Polygon((-73.576307358, 23.329437797), (-79.576231094, 23.359689514), (-79.60648281, 17.359765778), (-73.606559074, 17.329514062), align=None)
        Polygon((-15.670066484, 73.772943514), (-21.66999022, 73.80319523), (-21.639738504, 79.803118966), (-15.639814768, 79.77286725), align=None)
        Polygon((23.329437797, 73.576307358), (23.359689514, 79.576231094), (17.359765778, 79.60648281), (17.329514062, 73.606559074), align=None)
    extrude(amount=-CUT_EXTRUDE5_DEPTH, mode=Mode.SUBTRACT)


solid = part.part
